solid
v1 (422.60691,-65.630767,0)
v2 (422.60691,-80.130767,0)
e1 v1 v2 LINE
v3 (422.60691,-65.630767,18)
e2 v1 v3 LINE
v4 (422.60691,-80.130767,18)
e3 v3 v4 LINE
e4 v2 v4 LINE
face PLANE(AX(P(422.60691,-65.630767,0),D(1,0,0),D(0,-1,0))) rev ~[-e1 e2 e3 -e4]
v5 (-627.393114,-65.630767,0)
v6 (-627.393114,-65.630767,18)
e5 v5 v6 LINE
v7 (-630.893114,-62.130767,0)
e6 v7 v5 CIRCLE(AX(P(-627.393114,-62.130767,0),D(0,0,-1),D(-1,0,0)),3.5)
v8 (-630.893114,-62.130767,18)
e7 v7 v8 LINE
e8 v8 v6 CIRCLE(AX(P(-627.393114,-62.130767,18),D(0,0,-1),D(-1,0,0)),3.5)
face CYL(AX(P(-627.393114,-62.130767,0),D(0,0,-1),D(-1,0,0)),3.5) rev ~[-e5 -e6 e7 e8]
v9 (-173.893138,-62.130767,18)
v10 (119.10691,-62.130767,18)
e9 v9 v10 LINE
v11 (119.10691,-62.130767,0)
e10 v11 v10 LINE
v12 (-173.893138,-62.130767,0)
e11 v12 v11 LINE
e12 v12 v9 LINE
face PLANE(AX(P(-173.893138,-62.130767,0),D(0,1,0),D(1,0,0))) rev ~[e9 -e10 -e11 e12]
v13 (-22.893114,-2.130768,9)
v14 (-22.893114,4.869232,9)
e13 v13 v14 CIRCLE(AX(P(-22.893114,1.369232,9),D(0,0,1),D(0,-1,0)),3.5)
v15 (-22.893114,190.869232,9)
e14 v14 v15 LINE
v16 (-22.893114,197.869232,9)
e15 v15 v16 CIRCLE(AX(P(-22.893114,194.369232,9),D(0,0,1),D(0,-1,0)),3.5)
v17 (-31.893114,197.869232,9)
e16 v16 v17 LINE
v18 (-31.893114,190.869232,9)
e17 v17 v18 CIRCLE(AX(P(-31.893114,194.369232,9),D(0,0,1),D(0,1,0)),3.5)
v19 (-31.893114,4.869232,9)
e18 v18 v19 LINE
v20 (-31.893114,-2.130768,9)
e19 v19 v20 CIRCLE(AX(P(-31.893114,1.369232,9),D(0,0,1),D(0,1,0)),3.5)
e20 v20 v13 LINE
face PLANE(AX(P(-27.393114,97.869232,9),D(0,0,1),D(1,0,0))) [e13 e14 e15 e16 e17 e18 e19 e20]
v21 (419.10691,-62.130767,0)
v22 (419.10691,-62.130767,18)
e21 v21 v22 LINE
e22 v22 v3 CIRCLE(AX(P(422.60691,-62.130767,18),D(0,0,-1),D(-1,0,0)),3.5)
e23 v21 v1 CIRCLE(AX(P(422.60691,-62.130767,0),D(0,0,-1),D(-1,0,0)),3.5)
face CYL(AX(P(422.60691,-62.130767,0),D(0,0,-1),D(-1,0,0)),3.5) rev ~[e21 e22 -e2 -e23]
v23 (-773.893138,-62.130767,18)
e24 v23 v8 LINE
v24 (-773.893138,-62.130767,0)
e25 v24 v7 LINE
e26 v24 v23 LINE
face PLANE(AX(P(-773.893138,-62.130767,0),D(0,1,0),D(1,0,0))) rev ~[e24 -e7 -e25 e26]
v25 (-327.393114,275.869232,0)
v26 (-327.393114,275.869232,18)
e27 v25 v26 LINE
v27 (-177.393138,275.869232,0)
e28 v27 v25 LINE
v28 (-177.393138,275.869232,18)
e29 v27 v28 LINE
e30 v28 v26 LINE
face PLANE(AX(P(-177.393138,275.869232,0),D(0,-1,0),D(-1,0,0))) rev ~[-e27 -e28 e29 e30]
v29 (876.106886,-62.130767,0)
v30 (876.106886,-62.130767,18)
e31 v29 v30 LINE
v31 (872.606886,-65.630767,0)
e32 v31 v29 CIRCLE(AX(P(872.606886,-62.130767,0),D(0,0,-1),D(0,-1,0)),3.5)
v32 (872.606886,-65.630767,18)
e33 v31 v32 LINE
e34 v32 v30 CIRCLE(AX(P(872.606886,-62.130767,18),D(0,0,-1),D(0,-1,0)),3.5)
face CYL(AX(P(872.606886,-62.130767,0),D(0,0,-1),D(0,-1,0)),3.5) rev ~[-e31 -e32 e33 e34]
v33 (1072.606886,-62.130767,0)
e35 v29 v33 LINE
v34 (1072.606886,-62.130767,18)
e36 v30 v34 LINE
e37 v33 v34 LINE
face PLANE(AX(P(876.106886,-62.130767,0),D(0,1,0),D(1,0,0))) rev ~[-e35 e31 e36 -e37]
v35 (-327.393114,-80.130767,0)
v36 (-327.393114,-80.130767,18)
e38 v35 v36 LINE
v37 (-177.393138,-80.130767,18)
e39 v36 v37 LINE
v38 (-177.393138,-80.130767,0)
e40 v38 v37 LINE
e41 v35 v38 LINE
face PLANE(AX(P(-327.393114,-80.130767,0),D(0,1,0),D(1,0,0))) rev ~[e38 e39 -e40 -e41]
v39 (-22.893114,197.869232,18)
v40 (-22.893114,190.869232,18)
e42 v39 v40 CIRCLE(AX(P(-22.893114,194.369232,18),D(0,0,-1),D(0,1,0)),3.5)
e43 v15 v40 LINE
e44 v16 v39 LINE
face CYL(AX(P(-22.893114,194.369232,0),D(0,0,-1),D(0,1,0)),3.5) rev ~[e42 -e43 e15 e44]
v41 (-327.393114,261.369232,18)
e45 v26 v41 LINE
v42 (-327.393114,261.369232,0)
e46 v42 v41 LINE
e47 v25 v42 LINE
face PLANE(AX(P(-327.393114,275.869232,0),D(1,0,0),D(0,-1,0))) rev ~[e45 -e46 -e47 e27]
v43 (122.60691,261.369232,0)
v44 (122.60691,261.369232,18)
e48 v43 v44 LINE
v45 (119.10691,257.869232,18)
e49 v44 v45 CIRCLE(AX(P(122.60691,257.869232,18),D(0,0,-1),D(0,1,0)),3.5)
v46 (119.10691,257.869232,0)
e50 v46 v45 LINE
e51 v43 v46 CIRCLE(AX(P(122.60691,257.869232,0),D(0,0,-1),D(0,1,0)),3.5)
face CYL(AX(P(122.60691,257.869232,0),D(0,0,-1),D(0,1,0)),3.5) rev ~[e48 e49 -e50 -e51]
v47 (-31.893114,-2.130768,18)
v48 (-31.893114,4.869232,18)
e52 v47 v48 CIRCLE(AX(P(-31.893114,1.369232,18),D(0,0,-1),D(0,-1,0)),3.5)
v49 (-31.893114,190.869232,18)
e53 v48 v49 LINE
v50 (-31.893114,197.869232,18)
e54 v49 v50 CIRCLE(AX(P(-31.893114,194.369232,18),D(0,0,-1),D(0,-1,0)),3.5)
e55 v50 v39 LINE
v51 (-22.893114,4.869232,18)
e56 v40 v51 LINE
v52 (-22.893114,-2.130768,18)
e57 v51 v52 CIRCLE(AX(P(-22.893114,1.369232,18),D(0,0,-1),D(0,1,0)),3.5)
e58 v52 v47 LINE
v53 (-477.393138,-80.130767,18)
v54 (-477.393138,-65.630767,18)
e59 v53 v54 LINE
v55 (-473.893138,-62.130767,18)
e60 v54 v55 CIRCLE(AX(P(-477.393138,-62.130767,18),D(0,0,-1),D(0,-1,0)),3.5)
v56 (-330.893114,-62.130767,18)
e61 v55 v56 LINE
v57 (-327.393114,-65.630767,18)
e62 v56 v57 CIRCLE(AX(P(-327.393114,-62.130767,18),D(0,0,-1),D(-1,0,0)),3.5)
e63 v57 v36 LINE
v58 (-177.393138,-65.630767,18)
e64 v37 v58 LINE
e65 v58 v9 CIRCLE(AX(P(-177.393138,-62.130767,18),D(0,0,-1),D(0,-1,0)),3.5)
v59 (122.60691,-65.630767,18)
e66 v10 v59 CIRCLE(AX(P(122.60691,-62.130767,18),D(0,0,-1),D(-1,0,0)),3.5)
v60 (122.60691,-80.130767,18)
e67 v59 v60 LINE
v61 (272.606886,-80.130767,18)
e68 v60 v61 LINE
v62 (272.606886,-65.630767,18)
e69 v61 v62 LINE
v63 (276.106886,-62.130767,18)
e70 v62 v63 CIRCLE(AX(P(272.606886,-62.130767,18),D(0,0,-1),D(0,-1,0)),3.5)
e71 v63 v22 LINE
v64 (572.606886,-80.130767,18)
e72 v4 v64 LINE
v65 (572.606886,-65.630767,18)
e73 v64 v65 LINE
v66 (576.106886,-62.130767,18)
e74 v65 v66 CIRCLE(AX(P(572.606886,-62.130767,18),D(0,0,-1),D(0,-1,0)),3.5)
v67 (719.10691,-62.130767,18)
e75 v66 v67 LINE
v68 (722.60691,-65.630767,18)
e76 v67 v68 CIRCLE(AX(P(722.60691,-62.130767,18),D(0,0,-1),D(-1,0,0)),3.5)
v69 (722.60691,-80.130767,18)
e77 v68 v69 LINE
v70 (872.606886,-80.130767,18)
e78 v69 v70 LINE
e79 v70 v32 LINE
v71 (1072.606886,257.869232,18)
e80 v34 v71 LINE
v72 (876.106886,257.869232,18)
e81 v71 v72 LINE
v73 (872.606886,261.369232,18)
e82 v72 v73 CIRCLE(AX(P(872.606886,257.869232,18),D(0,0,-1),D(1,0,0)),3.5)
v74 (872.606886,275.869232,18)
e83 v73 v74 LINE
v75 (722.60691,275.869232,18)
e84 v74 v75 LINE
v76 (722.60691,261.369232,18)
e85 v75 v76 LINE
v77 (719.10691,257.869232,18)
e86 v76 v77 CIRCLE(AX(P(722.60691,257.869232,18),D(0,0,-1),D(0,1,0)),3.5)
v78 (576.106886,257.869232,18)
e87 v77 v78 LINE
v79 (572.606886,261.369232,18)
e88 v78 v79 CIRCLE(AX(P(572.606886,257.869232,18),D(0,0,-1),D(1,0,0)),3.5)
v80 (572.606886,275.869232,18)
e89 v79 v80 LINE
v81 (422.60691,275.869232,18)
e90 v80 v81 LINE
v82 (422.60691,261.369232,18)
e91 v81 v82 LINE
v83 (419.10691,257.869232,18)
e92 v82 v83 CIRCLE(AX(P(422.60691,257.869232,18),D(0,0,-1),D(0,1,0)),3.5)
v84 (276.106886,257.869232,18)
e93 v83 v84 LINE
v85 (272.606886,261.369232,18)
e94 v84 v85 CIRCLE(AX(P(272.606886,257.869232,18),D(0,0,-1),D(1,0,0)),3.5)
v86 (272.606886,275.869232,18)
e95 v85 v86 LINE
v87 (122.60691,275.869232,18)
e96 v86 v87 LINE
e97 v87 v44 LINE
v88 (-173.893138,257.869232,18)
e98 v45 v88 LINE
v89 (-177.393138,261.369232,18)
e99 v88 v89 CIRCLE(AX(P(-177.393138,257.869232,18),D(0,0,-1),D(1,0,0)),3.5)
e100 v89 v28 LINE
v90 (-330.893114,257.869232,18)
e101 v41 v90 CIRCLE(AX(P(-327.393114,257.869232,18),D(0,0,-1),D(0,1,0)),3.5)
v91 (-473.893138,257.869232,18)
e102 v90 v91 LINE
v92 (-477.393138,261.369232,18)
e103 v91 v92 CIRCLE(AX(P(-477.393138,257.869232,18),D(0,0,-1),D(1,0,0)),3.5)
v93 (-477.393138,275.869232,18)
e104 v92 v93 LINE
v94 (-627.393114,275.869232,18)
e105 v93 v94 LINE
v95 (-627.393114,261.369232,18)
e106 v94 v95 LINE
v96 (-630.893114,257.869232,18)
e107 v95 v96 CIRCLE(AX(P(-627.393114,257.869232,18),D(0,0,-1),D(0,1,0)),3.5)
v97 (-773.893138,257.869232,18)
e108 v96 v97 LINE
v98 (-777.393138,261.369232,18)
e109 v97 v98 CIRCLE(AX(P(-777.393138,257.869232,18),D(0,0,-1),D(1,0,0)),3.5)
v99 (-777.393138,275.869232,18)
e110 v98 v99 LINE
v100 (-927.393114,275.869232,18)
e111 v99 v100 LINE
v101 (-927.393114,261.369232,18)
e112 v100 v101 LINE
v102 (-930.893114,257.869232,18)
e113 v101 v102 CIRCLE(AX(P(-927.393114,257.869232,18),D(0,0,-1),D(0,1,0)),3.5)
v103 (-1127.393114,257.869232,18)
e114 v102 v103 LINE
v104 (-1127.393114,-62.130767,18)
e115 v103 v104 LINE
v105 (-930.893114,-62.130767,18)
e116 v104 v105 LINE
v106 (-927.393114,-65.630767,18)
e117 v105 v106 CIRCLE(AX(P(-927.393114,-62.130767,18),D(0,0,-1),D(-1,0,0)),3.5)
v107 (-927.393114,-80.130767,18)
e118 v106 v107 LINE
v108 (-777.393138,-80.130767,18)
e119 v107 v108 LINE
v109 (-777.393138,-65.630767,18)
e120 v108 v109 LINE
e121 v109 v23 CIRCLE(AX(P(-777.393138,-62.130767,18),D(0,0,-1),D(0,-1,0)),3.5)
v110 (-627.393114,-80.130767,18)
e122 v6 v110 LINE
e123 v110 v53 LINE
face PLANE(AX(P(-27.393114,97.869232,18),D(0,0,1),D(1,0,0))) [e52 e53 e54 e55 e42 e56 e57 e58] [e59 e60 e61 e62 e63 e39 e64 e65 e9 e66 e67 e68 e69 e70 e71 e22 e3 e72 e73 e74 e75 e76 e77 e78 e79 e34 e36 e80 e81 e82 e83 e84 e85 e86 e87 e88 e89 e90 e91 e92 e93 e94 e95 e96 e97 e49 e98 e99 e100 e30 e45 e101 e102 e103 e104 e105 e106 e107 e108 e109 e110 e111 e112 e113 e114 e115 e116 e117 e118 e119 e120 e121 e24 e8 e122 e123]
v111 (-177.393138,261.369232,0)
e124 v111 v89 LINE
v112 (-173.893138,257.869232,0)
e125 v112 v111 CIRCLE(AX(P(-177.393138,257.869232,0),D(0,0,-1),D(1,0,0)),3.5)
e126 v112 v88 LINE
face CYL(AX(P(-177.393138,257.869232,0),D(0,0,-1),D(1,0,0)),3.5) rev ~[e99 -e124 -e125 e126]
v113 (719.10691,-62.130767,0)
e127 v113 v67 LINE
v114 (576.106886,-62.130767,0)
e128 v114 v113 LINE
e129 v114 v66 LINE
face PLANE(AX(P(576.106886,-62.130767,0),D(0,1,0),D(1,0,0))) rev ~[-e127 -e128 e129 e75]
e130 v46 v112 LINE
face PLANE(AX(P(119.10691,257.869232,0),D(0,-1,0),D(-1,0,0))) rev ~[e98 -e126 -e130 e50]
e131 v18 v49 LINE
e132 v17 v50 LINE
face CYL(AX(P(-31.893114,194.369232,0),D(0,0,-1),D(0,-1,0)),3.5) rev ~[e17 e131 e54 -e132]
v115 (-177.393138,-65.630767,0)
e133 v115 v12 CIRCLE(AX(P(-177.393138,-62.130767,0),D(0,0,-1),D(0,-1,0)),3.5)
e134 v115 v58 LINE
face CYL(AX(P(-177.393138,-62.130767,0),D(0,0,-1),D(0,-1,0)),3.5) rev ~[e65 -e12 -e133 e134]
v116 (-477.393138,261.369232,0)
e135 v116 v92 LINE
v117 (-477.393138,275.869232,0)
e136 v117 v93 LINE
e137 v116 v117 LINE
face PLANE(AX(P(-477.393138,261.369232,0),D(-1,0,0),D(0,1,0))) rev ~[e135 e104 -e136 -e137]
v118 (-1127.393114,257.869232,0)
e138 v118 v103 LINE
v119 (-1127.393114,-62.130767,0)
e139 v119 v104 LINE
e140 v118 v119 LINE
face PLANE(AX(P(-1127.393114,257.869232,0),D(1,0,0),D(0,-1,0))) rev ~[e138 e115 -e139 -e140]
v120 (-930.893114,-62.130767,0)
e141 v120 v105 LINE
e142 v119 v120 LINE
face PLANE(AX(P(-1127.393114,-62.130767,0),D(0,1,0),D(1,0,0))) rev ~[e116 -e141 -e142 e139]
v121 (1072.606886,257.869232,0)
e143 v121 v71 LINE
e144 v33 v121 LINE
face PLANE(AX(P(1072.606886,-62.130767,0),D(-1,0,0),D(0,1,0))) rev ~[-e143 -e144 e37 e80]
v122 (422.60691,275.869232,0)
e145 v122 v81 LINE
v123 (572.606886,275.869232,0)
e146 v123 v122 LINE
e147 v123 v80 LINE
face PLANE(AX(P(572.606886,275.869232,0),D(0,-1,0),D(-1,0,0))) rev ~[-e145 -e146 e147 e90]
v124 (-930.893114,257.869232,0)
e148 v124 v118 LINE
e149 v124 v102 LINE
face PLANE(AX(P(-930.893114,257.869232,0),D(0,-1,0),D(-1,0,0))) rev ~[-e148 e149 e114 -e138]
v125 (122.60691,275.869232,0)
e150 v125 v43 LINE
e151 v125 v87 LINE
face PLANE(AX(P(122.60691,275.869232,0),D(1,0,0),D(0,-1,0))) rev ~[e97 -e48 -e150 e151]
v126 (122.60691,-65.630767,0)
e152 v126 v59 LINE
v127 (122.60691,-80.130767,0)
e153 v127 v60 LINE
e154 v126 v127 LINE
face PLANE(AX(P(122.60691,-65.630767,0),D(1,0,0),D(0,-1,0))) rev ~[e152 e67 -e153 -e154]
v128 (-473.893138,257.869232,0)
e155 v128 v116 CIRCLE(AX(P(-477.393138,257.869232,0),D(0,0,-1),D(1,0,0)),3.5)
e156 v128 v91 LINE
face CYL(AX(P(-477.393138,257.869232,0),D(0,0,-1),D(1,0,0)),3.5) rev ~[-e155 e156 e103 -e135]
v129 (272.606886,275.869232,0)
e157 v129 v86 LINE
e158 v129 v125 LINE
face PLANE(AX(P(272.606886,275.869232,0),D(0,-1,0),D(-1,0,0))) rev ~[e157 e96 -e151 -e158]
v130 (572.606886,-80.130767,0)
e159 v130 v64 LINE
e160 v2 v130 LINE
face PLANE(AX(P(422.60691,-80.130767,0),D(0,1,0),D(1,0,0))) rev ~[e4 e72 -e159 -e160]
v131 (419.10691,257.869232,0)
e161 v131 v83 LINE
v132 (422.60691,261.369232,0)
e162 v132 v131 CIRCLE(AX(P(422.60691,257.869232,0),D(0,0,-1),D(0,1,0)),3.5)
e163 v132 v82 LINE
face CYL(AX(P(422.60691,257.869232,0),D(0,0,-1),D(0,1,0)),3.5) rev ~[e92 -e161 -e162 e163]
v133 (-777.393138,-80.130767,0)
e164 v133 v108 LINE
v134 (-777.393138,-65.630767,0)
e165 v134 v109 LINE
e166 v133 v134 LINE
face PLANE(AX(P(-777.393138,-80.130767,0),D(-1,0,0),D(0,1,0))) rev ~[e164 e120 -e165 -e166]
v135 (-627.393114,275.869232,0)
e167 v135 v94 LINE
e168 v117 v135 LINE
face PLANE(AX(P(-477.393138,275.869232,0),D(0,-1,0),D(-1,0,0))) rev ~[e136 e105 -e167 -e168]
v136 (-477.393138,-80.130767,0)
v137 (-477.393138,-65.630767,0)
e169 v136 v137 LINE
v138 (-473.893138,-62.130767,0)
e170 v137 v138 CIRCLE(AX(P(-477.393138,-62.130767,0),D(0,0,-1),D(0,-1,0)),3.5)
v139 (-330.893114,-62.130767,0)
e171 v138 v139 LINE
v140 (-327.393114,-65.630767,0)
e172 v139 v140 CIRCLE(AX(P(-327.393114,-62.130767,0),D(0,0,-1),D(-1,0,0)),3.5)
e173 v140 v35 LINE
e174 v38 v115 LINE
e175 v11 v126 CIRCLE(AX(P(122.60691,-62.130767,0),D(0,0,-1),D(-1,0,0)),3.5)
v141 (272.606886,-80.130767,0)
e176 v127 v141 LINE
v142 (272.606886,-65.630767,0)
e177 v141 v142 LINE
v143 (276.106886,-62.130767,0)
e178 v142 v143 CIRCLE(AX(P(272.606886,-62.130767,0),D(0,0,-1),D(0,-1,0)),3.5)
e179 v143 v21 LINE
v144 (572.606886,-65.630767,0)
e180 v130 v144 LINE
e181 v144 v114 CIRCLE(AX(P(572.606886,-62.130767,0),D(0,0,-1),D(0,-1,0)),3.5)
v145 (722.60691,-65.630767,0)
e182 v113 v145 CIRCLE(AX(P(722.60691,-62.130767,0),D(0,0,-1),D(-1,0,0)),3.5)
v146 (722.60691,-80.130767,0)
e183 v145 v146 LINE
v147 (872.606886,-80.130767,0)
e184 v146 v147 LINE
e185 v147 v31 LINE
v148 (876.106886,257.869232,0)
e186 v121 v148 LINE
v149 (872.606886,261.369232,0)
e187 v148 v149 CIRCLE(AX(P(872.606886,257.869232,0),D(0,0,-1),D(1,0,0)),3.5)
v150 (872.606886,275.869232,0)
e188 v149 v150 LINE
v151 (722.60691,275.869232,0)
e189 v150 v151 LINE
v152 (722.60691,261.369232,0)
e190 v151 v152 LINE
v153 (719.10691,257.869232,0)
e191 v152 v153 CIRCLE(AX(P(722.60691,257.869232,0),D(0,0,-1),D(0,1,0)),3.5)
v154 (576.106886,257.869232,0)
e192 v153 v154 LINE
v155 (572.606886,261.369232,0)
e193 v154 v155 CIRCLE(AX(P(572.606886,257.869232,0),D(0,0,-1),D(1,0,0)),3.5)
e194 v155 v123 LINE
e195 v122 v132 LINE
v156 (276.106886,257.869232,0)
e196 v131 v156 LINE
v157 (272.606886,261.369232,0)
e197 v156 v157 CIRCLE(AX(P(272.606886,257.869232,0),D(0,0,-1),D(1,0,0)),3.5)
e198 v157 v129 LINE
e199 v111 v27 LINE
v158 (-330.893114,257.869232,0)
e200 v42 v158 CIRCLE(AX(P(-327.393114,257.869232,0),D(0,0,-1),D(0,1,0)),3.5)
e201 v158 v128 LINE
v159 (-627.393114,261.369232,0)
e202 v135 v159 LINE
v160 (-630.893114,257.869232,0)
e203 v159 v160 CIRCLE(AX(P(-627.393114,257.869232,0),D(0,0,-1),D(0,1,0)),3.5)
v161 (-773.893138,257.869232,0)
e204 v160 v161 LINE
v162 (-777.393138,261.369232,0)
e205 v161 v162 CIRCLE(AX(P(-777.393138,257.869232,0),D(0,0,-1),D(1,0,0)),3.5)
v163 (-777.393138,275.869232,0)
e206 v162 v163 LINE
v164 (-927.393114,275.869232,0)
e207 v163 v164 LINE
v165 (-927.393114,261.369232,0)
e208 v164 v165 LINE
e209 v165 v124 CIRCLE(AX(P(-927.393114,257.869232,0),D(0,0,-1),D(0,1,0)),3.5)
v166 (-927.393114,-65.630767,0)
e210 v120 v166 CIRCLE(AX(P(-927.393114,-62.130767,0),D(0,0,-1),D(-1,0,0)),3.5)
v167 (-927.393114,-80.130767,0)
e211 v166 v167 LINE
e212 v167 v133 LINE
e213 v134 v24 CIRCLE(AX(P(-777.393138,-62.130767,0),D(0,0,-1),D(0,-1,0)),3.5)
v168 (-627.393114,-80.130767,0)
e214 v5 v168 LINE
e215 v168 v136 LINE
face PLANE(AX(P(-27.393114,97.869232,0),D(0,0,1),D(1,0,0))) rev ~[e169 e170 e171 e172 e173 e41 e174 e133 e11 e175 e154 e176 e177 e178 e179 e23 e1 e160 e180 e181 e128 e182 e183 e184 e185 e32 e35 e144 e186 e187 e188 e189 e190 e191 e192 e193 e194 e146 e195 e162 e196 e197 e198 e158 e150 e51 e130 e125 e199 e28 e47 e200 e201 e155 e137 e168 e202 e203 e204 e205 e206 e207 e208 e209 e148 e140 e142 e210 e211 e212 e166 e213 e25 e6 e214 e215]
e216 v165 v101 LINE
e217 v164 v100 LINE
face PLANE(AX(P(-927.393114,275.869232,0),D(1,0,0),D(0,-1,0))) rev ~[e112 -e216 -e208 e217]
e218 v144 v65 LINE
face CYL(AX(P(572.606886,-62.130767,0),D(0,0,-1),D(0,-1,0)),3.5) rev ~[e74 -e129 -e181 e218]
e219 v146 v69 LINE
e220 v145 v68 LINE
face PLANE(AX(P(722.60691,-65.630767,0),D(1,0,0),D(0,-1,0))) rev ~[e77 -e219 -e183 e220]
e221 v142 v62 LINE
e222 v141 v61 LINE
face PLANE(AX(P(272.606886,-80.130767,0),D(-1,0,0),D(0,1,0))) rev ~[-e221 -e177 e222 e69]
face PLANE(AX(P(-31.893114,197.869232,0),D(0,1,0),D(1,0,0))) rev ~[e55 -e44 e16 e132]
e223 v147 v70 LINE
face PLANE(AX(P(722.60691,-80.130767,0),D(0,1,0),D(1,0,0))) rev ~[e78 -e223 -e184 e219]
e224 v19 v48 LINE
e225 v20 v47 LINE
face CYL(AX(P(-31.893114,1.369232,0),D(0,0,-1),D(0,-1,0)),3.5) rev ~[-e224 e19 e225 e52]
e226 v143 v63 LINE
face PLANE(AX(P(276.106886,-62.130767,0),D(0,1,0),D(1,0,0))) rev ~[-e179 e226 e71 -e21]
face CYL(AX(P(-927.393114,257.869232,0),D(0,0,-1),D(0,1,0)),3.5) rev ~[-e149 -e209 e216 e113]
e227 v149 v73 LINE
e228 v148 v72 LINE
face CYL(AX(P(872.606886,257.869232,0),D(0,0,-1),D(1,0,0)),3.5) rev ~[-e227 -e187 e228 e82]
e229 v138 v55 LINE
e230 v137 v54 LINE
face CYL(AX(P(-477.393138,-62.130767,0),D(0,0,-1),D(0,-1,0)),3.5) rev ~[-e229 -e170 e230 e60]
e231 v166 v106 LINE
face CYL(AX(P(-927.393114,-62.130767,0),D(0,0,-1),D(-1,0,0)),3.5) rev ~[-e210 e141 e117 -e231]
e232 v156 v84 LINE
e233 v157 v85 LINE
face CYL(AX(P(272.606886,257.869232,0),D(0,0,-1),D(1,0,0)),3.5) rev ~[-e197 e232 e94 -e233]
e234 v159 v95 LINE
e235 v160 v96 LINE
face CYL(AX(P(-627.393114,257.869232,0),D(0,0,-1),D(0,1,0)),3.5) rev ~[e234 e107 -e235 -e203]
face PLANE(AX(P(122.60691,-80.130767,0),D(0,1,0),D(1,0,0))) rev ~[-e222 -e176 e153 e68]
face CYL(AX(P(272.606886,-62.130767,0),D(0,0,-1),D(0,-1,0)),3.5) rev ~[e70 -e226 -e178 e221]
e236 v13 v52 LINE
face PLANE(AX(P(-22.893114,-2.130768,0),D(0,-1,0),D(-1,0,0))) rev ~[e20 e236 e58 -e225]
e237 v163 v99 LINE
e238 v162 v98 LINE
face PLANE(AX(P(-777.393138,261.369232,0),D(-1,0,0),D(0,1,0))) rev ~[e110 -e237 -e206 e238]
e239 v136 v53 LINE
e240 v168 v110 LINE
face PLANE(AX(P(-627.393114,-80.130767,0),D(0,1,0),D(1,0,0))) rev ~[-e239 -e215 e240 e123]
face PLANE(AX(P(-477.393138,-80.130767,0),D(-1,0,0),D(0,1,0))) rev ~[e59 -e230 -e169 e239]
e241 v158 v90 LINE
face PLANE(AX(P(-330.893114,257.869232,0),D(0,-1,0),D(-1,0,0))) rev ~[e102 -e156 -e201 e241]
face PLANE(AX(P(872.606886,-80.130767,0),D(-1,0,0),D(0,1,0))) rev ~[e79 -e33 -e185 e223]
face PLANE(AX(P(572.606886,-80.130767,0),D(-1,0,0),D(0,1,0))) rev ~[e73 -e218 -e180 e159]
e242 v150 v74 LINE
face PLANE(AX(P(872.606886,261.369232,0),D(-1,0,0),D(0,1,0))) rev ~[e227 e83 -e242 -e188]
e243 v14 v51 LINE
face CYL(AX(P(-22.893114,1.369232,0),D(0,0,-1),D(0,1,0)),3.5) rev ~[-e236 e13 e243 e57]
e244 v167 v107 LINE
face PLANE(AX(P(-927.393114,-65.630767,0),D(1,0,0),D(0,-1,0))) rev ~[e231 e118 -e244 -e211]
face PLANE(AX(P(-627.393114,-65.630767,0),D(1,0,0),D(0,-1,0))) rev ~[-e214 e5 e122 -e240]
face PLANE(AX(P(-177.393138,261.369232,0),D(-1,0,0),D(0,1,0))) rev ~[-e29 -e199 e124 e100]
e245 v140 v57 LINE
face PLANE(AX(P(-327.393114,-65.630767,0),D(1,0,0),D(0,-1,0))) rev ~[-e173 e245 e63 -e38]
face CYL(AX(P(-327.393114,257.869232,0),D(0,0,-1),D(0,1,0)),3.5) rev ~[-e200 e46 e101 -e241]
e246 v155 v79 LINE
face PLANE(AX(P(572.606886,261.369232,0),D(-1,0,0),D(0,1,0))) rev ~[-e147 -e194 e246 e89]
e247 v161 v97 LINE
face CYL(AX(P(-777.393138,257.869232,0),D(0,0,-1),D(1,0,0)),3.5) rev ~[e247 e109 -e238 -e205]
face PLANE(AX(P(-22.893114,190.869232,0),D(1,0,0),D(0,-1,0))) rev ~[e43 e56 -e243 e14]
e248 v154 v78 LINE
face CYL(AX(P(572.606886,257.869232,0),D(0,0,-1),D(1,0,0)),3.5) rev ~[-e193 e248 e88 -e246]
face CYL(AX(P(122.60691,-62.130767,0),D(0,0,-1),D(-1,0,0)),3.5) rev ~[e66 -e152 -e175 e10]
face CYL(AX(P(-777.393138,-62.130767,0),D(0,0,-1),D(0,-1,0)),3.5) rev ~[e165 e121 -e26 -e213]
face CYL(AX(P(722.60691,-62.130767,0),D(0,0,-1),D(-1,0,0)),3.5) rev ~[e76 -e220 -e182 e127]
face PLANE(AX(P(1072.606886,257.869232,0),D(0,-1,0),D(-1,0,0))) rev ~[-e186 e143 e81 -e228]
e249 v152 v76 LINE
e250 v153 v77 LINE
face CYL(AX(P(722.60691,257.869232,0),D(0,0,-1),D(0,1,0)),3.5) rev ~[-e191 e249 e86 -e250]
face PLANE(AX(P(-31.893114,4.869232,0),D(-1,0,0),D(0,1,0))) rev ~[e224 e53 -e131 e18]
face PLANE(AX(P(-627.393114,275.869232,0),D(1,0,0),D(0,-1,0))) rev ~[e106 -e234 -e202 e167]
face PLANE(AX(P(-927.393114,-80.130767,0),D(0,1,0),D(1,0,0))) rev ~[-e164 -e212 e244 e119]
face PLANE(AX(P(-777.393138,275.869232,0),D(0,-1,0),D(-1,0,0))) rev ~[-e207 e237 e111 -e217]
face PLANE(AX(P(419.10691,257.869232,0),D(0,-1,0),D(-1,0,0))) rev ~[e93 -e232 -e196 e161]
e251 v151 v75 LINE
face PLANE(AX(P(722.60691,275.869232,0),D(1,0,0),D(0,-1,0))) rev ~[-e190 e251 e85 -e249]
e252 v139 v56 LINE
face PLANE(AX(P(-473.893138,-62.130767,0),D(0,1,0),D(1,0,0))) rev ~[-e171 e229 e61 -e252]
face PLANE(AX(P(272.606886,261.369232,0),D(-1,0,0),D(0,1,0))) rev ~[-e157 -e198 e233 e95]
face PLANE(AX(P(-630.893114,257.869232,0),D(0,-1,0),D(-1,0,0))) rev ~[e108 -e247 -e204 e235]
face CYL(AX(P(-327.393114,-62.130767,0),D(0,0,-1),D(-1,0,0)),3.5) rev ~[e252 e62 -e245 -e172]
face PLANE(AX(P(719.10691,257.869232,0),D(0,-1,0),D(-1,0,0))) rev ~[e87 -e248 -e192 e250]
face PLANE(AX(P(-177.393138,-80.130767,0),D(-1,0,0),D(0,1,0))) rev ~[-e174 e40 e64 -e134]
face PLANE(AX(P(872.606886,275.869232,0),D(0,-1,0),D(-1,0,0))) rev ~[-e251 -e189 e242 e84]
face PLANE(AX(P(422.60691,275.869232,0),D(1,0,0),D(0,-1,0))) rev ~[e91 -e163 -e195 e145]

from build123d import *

# Parameters (mm, degrees)
F1_DEPTH = 18
F2_DEPTH = 9


# Not quite as in the source:
# - ends of sketch curves that miss each other by under 0.0002 mm in the source are joined


with BuildPart() as f1:
    # F0 (on Top) → F1 (new body)
    with BuildSketch(Plane.XY):
        with BuildLine():
            Line((-1127.3931139915, 97.8692322969), (-1127.3931139915, -62.1307669387))
            Line((-1127.3931139915, -62.1307669387), (-930.8931139915, -62.1307669387))
            ThreePointArc((-930.8931139915, -62.1307669387), (-924.9182402574, -59.6558932046), (-927.3931139915, -65.6307669387))
            Line((-927.3931139915, -65.6307669387), (-927.3931139915, -80.1307669387))
            Line((-927.3931139915, -80.1307669387), (-777.3931378334, -80.1307669387))
            Line((-777.3931378334, -80.1307669387), (-777.3931378334, -65.6307669387))
            ThreePointArc((-777.3931378334, -65.6307669387), (-779.8680115675, -59.6558932046), (-773.8931378334, -62.1307669387))
            Line((-773.8931378334, -62.1307669387), (-630.8931139915, -62.1307669387))
            ThreePointArc((-630.8931139915, -62.1307669387), (-624.9182402574, -59.6558932046), (-627.3931139915, -65.6307669387))
            Line((-627.3931139915, -65.6307669387), (-627.3931139915, -80.1307669387))
            Line((-627.3931139915, -80.1307669387), (-477.3931378334, -80.1307669387))
            Line((-477.3931378334, -80.1307669387), (-477.3931378334, -65.6307669387))
            ThreePointArc((-477.3931378334, -65.6307669387), (-479.8680115675, -59.6558932046), (-473.8931378334, -62.1307669387))
            Line((-473.8931378334, -62.1307669387), (-330.8931139915, -62.1307669387))
            ThreePointArc((-330.8931139915, -62.1307669387), (-324.9182402574, -59.6558932046), (-327.3931139915, -65.6307669387))
            Line((-327.3931139915, -65.6307669387), (-327.3931139915, -80.1307669387))
            Line((-327.3931139915, -80.1307669387), (-177.3931378334, -80.1307669387))
            Line((-177.3931378334, -80.1307669387), (-177.3931378334, -65.6307669387))
            ThreePointArc((-177.3931378334, -65.6307669387), (-179.8680115675, -59.6558932046), (-173.8931378334, -62.1307669387))
            Line((-173.8931378334, -62.1307669387), (-27.3931378334, -62.1307669387))
            Line((-27.3931378334, -62.1307669387), (119.1069098503, -62.1307669387))
            ThreePointArc((119.1069098503, -62.1307669387), (125.0817835845, -59.6558932046), (122.6069098503, -65.6307669387))
            Line((122.6069098503, -65.6307669387), (122.6069098503, -80.1307669387))
            Line((122.6069098503, -80.1307669387), (272.6068860085, -80.1307669387))
            Line((272.6068860085, -80.1307669387), (272.6068860085, -65.6307669387))
            ThreePointArc((272.6068860085, -65.6307669387), (270.1320122743, -59.6558932046), (276.1068860085, -62.1307669387))
            Line((276.1068860085, -62.1307669387), (419.1069098503, -62.1307669387))
            ThreePointArc((419.1069098503, -62.1307669387), (425.0817835845, -59.6558932046), (422.6069098503, -65.6307669387))
            Line((422.6069098503, -65.6307669387), (422.6069098503, -80.1307669387))
            Line((422.6069098503, -80.1307669387), (572.6068860085, -80.1307669387))
            Line((572.6068860085, -80.1307669387), (572.6068860085, -65.6307669387))
            ThreePointArc((572.6068860085, -65.6307669387), (570.1320122743, -59.6558932046), (576.1068860085, -62.1307669387))
            Line((576.1068860085, -62.1307669387), (719.1069098503, -62.1307669387))
            ThreePointArc((719.1069098503, -62.1307669387), (725.0817835845, -59.6558932046), (722.6069098503, -65.6307669387))
            Line((722.6069098503, -65.6307669387), (722.6069098503, -80.1307669387))
            Line((722.6069098503, -80.1307669387), (872.6068860085, -80.1307669387))
            Line((872.6068860085, -80.1307669387), (872.6068860085, -65.6307669387))
            ThreePointArc((872.6068860085, -65.6307669387), (870.1320122743, -59.6558932046), (876.1068860085, -62.1307669387))
            Line((876.1068860085, -62.1307669387), (1072.6068860085, -62.1307669387))
            Line((1072.6068860085, -62.1307669387), (1072.6068860085, 97.8692322969))
            Line((1072.6068860085, 97.8692322969), (1072.6068860085, 257.8692315326))
            Line((1072.6068860085, 257.8692315326), (876.1068860085, 257.8692315326))
            ThreePointArc((876.1068860085, 257.8692315326), (870.1320122743, 255.3943577985), (872.6068860085, 261.3692315326))
            Line((872.6068860085, 261.3692315326), (872.6068860085, 275.8692315326))
            Line((872.6068860085, 275.8692315326), (722.6069098503, 275.8692315326))
            Line((722.6069098503, 275.8692315326), (722.6069098503, 261.3692315326))
            ThreePointArc((722.6069098503, 261.3692315326), (725.0817835845, 255.3943577985), (719.1069098503, 257.8692315326))
            Line((719.1069098503, 257.8692315326), (576.1068860085, 257.8692315326))
            ThreePointArc((576.1068860085, 257.8692315326), (570.1320122743, 255.3943577985), (572.6068860085, 261.3692315326))
            Line((572.6068860085, 261.3692315326), (572.6068860085, 275.8692315326))
            Line((572.6068860085, 275.8692315326), (422.6069098503, 275.8692315326))
            Line((422.6069098503, 275.8692315326), (422.6069098503, 261.3692315326))
            ThreePointArc((422.6069098503, 261.3692315326), (425.0817835845, 255.3943577985), (419.1069098503, 257.8692315326))
            Line((419.1069098503, 257.8692315326), (276.1068860085, 257.8692315326))
            ThreePointArc((276.1068860085, 257.8692315326), (270.1320122743, 255.3943577985), (272.6068860085, 261.3692315326))
            Line((272.6068860085, 261.3692315326), (272.6068860085, 275.8692315326))
            Line((272.6068860085, 275.8692315326), (122.6069098503, 275.8692315326))
            Line((122.6069098503, 275.8692315326), (122.6069098503, 261.3692315326))
            ThreePointArc((122.6069098503, 261.3692315326), (125.0817835845, 255.3943577985), (119.1069098503, 257.8692315326))
            Line((119.1069098503, 257.8692315326), (-27.3930901497, 257.8692315326))
            Line((-27.3930901497, 257.8692315326), (-173.8931378334, 257.8692315326))
            ThreePointArc((-173.8931378334, 257.8692315326), (-179.8680115675, 255.3943577985), (-177.3931378334, 261.3692315326))
            Line((-177.3931378334, 261.3692315326), (-177.3931378334, 275.8692315326))
            Line((-177.3931378334, 275.8692315326), (-327.3931139915, 275.8692315326))
            Line((-327.3931139915, 275.8692315326), (-327.3931139915, 261.3692315326))
            ThreePointArc((-327.3931139915, 261.3692315326), (-324.9182402574, 255.3943577985), (-330.8931139915, 257.8692315326))
            Line((-330.8931139915, 257.8692315326), (-473.8931378334, 257.8692315326))
            ThreePointArc((-473.8931378334, 257.8692315326), (-479.8680115675, 255.3943577985), (-477.3931378334, 261.3692315326))
            Line((-477.3931378334, 261.3692315326), (-477.3931378334, 275.8692315326))
            Line((-477.3931378334, 275.8692315326), (-627.3931139915, 275.8692315326))
            Line((-627.3931139915, 275.8692315326), (-627.3931139915, 261.3692315326))
            ThreePointArc((-627.3931139915, 261.3692315326), (-624.9182402574, 255.3943577985), (-630.8931139915, 257.8692315326))
            Line((-630.8931139915, 257.8692315326), (-773.8931378334, 257.8692315326))
            ThreePointArc((-773.8931378334, 257.8692315326), (-779.8680115675, 255.3943577985), (-777.3931378334, 261.3692315326))
            Line((-777.3931378334, 261.3692315326), (-777.3931378334, 275.8692315326))
            Line((-777.3931378334, 275.8692315326), (-927.3931139915, 275.8692315326))
            Line((-927.3931139915, 275.8692315326), (-927.3931139915, 261.3692315326))
            ThreePointArc((-927.3931139915, 261.3692315326), (-924.9182402574, 255.3943577985), (-930.8931139915, 257.8692315326))
            Line((-930.8931139915, 257.8692315326), (-1127.3931139915, 257.8692315326))
            Line((-1127.3931139915, 257.8692315326), (-1127.3931139915, 97.8692322969))
        make_face()
        with BuildLine():
            Line((-22.8931139915, 190.8692322969), (-22.8931139915, 97.8692322969))
            Line((-22.8931139915, 97.8692322969), (-22.8931139915, 4.8692322969))
            ThreePointArc((-22.8931139915, 4.8692322969), (-19.3931139915, 1.3692322969), (-22.8931139915, -2.1307677031))
            Line((-22.8931139915, -2.1307677031), (-27.3931139915, -2.1307677031))
            Line((-27.3931139915, -2.1307677031), (-31.8931139915, -2.1307677031))
            ThreePointArc((-31.8931139915, -2.1307677031), (-35.3931139915, 1.3692322969), (-31.8931139915, 4.8692322969))
            Line((-31.8931139915, 4.8692322969), (-31.8931139915, 97.8692322969))
            Line((-31.8931139915, 97.8692322969), (-31.8931139915, 190.8692322969))
            ThreePointArc((-31.8931139915, 190.8692322969), (-35.3931139915, 194.3692322969), (-31.8931139915, 197.8692322969))
            Line((-31.8931139915, 197.8692322969), (-27.3931139915, 197.8692322969))
            Line((-27.3931139915, 197.8692322969), (-22.8931139915, 197.8692322969))
            ThreePointArc((-22.8931139915, 197.8692322969), (-19.3931139915, 194.3692322969), (-22.8931139915, 190.8692322969))
        make_face(mode=Mode.SUBTRACT)
    extrude(amount=F1_DEPTH)

    # F0 (on Top) → F2 (join)
    with BuildSketch(Plane.XY):
        with BuildLine():
            Line((-22.8931139915, 4.8692322969), (-22.8931139915, 97.8692322969))
            Line((-22.8931139915, 97.8692322969), (-22.8931139915, 190.8692322969))
            ThreePointArc((-22.8931139915, 190.8692322969), (-19.3931139915, 194.3692322969), (-22.8931139915, 197.8692322969))
            Line((-22.8931139915, 197.8692322969), (-27.3931139915, 197.8692322969))
            Line((-27.3931139915, 197.8692322969), (-31.8931139915, 197.8692322969))
            ThreePointArc((-31.8931139915, 197.8692322969), (-35.3931139915, 194.3692322969), (-31.8931139915, 190.8692322969))
            Line((-31.8931139915, 190.8692322969), (-31.8931139915, 97.8692322969))
            Line((-31.8931139915, 97.8692322969), (-31.8931139915, 4.8692322969))
            ThreePointArc((-31.8931139915, 4.8692322969), (-35.3931139915, 1.3692322969), (-31.8931139915, -2.1307677031))
            Line((-31.8931139915, -2.1307677031), (-27.3931139915, -2.1307677031))
            Line((-27.3931139915, -2.1307677031), (-22.8931139915, -2.1307677031))
            ThreePointArc((-22.8931139915, -2.1307677031), (-19.3931139915, 1.3692322969), (-22.8931139915, 4.8692322969))
        make_face()
    extrude(amount=F2_DEPTH)


solid = f1.part
